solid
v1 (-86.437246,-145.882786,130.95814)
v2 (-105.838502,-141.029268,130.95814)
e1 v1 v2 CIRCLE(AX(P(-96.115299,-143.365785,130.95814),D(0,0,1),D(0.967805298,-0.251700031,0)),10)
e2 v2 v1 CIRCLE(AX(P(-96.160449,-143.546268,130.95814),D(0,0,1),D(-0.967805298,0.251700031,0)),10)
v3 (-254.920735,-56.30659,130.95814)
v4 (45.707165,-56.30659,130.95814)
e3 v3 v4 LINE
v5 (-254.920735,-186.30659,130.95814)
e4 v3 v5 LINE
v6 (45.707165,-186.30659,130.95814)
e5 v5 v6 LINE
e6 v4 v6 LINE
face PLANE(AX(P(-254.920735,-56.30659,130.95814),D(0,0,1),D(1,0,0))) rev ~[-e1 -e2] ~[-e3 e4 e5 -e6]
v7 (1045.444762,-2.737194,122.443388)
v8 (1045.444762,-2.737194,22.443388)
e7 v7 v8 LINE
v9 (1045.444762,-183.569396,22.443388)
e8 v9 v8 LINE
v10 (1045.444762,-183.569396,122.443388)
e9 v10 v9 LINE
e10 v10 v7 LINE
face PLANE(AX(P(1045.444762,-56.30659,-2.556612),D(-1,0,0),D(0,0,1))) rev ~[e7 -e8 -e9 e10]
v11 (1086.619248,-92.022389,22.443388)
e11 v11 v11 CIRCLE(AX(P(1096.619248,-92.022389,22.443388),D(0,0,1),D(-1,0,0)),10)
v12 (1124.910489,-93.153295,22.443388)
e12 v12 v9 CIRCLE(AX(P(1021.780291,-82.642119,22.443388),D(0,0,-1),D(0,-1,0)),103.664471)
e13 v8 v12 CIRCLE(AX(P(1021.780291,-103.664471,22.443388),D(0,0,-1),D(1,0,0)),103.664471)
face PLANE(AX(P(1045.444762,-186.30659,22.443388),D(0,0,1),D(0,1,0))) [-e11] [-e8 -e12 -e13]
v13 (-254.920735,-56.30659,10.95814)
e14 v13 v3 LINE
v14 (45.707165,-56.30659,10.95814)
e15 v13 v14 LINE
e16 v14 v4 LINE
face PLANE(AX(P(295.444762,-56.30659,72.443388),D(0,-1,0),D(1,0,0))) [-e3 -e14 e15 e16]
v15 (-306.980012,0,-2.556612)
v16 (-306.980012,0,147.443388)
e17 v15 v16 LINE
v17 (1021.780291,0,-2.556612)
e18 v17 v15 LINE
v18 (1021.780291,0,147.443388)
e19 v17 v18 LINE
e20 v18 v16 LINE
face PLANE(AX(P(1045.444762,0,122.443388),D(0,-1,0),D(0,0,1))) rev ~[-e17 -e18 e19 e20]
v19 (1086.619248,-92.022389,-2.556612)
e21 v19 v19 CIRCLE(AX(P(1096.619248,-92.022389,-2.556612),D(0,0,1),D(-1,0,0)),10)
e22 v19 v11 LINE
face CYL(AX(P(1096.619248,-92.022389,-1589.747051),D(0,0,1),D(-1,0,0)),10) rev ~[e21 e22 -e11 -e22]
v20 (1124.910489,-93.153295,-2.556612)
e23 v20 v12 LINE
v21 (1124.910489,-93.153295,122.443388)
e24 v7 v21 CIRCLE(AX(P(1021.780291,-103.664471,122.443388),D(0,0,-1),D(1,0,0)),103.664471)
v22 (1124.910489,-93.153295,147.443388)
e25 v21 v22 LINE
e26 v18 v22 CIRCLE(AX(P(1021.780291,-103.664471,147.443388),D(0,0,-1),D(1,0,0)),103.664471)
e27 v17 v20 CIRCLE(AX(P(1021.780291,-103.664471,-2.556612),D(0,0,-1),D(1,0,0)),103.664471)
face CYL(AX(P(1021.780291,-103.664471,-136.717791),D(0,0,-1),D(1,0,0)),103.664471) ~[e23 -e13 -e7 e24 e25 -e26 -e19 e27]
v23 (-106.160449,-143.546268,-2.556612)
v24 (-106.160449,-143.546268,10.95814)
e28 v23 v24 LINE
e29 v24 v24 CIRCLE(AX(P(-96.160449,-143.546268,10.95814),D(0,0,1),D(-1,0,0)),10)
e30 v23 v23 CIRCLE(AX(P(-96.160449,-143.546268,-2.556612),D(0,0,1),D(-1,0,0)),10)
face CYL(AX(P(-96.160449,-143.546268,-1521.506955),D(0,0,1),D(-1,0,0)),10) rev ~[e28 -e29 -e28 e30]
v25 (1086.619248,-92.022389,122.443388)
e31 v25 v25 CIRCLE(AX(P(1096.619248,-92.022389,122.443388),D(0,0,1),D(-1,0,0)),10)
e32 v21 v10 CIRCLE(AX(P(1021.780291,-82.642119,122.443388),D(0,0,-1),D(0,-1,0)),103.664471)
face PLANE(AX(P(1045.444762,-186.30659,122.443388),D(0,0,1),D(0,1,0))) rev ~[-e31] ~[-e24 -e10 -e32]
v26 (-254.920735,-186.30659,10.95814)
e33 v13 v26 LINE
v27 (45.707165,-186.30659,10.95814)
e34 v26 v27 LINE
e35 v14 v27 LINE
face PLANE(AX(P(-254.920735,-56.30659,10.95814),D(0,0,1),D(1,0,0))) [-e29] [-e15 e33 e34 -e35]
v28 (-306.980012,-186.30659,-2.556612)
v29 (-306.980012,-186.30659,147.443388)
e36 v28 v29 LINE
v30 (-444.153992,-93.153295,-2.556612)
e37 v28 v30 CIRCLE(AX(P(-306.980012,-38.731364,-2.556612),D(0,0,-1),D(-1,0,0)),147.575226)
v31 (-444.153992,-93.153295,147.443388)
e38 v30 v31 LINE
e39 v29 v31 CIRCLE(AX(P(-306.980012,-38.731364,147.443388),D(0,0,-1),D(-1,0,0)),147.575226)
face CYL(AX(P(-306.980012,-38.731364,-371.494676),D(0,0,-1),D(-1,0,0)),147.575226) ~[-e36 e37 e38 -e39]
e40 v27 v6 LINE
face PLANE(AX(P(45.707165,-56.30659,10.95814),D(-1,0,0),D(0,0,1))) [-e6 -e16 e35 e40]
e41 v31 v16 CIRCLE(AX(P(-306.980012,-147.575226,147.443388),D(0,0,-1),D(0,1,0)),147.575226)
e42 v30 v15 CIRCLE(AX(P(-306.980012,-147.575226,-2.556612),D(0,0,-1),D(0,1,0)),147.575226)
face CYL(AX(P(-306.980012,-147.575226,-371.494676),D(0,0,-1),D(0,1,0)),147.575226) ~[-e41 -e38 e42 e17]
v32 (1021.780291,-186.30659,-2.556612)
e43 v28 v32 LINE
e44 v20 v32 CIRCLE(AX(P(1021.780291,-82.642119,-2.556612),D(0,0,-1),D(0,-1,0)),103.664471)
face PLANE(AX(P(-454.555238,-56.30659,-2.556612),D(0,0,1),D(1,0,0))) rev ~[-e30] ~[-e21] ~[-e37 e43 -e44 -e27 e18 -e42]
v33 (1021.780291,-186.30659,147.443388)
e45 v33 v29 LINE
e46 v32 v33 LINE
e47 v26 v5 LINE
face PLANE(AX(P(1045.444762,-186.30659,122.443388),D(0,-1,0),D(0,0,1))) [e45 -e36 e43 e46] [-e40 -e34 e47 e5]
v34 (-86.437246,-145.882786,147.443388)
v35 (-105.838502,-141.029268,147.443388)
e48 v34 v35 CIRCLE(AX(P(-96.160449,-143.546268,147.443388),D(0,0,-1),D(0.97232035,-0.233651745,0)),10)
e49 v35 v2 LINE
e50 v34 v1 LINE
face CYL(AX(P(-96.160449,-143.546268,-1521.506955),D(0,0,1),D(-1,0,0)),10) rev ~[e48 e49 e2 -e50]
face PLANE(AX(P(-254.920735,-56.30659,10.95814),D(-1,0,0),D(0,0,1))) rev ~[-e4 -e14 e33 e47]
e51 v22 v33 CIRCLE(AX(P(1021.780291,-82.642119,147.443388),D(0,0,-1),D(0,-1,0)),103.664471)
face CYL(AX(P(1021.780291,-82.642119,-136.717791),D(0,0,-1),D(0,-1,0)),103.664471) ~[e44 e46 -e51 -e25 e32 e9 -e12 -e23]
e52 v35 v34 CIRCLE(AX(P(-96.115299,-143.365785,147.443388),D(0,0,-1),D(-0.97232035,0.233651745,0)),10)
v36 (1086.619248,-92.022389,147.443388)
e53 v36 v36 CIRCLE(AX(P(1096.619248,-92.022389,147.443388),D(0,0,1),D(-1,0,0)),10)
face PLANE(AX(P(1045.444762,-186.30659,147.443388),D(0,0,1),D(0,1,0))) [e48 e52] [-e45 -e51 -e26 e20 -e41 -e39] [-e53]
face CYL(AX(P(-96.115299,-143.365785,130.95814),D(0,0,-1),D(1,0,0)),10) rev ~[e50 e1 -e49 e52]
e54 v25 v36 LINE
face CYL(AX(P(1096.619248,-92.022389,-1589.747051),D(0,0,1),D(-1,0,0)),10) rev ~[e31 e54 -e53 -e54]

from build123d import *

# Parameters (mm, degrees)
F0_W         = 1500
F0_H         = 150
F1_DEPTH     = 56.30659
F2_W         = 1500
F2_H         = 150
F2_W_2       = 300.6279
F2_H_2       = 120
F3_DEPTH     = 130
F6_D         = 20
F6_DEPTH     = 16.486247664
F7_D         = 20
F8_T1_DEPTH  = 887.8761290407
F9_W         = 186.30659
F9_H         = 25
F10_DEPTH    = 80
F11_T1_DEPTH = 543.3223571193
F11_T3_DEPTH = 543.3223571193
F13_D        = 20


# Not quite as in the source:
# - a fillet or chamfer that OpenCascade refuses, or shapes differently, is made with other operations: its cross-section is extruded or revolved along the edge and cut away or added
# - a feature names something its author has since deleted; it is built from what else it names


with BuildPart() as f1:
    # F0 (on Front) → F1 (new body)
    with BuildSketch(Plane.XZ):
        with Locations((295.444762387, 72.4433880299)):
            Rectangle(F0_W, F0_H)
    extrude(amount=F1_DEPTH)

    # F2 (on face) → F3 (join)
    with BuildSketch(Plane.XZ.offset(56.30659)):
        with Locations((295.444762387, 72.4433880299)):
            Rectangle(F2_W, F2_H)
        with Locations((-104.6067848625, 70.9581403659)):
            Rectangle(F2_W_2, F2_H_2, mode=Mode.SUBTRACT)
    extrude(amount=F3_DEPTH)

    # F6 (through all, one way)
    with BuildSketch(Plane(origin=(0, 0, 130.9581403659), x_dir=(1, 0, 0), z_dir=(0, 0, -1))):
        with Locations((-96.1152985692, 143.3657854795)):
            Circle(F6_D / 2)
    extrude(amount=-F6_DEPTH, mode=Mode.SUBTRACT)

    # F7 (through all)
    with Locations(Plane(origin=(0, 0, -2.5566119701), x_dir=(1, 0, 0), z_dir=(0, 0, -1))):
        with Locations((-96.1604490876, 143.5462683439)):
            Hole(F7_D / 2)

    # F8: fillet of radius 147.5752258081 on 2 edges, made by hand

    # F8_s2 → F8_t1 (cut)
    with BuildSketch(Plane.XY.offset(-371.4946764904)):
        with BuildLine():
            ThreePointArc((-454.555237613, -38.7313641919), (-411.331454709, -143.0828070959), (-306.9800118049, -186.30659))
            Line((-306.9800118049, -186.30659), (-454.555237613, -186.30659))
            Line((-454.555237613, -186.30659), (-454.555237613, -38.7313641919))
        make_face()
        with BuildLine():
            ThreePointArc((-306.9800118049, 0), (-411.331454709, -43.2237829041), (-454.555237613, -147.5752258081))
            Line((-454.555237613, -147.5752258081), (-454.555237613, 0))
            Line((-454.555237613, 0), (-306.9800118049, 0))
        make_face()
    extrude(amount=F8_T1_DEPTH, mode=Mode.SUBTRACT)

    # F9 (on face) → F10 (join)
    with BuildSketch(Plane.YZ.offset(1045.444762387)):
        with Locations((-93.153295, 134.9433880299)):
            Rectangle(F9_W, F9_H)
        with Locations((-93.153295, 9.9433880299)):
            Rectangle(F9_W, F9_H)
    extrude(amount=F10_DEPTH)

    # F11: fillet of radius 103.6644714239 on 4 edges, made by hand

    # F11_s2 → F11_t1 (cut)
    with BuildSketch(Plane.XY.offset(-136.7177905297)):
        with BuildLine():
            ThreePointArc((1125.444762387, -103.6644714239), (1095.082141675, -30.3626207119), (1021.7802909631, 0))
            Line((1021.7802909631, 0), (1125.444762387, 0))
            Line((1125.444762387, 0), (1125.444762387, -103.6644714239))
        make_face()
        with BuildLine():
            ThreePointArc((1021.7802909631, -186.30659), (1095.082141675, -155.9439692881), (1125.444762387, -82.6421185761))
            Line((1125.444762387, -82.6421185761), (1125.444762387, -186.30659))
            Line((1125.444762387, -186.30659), (1021.7802909631, -186.30659))
        make_face()
    extrude(amount=F11_T1_DEPTH, mode=Mode.SUBTRACT)

    # F11_s4 → F11_t3 (cut)
    with BuildSketch(Plane.XY.offset(-261.7177905297)):
        with BuildLine():
            ThreePointArc((1125.444762387, -103.6644714239), (1095.082141675, -30.3626207119), (1021.7802909631, 0))
            Line((1021.7802909631, 0), (1125.444762387, 0))
            Line((1125.444762387, 0), (1125.444762387, -103.6644714239))
        make_face()
        with BuildLine():
            ThreePointArc((1021.7802909631, -186.30659), (1095.082141675, -155.9439692881), (1125.444762387, -82.6421185761))
            Line((1125.444762387, -82.6421185761), (1125.444762387, -186.30659))
            Line((1125.444762387, -186.30659), (1021.7802909631, -186.30659))
        make_face()
    extrude(amount=F11_T3_DEPTH, mode=Mode.SUBTRACT)

    # F13 (through all)
    with Locations(Plane(origin=(0, 0, -2.5566119701), x_dir=(1, 0, 0), z_dir=(0, 0, -1))):
        with Locations((1096.6192483902, 92.0223891735)):
            Hole(F13_D / 2)


solid = f1.part
